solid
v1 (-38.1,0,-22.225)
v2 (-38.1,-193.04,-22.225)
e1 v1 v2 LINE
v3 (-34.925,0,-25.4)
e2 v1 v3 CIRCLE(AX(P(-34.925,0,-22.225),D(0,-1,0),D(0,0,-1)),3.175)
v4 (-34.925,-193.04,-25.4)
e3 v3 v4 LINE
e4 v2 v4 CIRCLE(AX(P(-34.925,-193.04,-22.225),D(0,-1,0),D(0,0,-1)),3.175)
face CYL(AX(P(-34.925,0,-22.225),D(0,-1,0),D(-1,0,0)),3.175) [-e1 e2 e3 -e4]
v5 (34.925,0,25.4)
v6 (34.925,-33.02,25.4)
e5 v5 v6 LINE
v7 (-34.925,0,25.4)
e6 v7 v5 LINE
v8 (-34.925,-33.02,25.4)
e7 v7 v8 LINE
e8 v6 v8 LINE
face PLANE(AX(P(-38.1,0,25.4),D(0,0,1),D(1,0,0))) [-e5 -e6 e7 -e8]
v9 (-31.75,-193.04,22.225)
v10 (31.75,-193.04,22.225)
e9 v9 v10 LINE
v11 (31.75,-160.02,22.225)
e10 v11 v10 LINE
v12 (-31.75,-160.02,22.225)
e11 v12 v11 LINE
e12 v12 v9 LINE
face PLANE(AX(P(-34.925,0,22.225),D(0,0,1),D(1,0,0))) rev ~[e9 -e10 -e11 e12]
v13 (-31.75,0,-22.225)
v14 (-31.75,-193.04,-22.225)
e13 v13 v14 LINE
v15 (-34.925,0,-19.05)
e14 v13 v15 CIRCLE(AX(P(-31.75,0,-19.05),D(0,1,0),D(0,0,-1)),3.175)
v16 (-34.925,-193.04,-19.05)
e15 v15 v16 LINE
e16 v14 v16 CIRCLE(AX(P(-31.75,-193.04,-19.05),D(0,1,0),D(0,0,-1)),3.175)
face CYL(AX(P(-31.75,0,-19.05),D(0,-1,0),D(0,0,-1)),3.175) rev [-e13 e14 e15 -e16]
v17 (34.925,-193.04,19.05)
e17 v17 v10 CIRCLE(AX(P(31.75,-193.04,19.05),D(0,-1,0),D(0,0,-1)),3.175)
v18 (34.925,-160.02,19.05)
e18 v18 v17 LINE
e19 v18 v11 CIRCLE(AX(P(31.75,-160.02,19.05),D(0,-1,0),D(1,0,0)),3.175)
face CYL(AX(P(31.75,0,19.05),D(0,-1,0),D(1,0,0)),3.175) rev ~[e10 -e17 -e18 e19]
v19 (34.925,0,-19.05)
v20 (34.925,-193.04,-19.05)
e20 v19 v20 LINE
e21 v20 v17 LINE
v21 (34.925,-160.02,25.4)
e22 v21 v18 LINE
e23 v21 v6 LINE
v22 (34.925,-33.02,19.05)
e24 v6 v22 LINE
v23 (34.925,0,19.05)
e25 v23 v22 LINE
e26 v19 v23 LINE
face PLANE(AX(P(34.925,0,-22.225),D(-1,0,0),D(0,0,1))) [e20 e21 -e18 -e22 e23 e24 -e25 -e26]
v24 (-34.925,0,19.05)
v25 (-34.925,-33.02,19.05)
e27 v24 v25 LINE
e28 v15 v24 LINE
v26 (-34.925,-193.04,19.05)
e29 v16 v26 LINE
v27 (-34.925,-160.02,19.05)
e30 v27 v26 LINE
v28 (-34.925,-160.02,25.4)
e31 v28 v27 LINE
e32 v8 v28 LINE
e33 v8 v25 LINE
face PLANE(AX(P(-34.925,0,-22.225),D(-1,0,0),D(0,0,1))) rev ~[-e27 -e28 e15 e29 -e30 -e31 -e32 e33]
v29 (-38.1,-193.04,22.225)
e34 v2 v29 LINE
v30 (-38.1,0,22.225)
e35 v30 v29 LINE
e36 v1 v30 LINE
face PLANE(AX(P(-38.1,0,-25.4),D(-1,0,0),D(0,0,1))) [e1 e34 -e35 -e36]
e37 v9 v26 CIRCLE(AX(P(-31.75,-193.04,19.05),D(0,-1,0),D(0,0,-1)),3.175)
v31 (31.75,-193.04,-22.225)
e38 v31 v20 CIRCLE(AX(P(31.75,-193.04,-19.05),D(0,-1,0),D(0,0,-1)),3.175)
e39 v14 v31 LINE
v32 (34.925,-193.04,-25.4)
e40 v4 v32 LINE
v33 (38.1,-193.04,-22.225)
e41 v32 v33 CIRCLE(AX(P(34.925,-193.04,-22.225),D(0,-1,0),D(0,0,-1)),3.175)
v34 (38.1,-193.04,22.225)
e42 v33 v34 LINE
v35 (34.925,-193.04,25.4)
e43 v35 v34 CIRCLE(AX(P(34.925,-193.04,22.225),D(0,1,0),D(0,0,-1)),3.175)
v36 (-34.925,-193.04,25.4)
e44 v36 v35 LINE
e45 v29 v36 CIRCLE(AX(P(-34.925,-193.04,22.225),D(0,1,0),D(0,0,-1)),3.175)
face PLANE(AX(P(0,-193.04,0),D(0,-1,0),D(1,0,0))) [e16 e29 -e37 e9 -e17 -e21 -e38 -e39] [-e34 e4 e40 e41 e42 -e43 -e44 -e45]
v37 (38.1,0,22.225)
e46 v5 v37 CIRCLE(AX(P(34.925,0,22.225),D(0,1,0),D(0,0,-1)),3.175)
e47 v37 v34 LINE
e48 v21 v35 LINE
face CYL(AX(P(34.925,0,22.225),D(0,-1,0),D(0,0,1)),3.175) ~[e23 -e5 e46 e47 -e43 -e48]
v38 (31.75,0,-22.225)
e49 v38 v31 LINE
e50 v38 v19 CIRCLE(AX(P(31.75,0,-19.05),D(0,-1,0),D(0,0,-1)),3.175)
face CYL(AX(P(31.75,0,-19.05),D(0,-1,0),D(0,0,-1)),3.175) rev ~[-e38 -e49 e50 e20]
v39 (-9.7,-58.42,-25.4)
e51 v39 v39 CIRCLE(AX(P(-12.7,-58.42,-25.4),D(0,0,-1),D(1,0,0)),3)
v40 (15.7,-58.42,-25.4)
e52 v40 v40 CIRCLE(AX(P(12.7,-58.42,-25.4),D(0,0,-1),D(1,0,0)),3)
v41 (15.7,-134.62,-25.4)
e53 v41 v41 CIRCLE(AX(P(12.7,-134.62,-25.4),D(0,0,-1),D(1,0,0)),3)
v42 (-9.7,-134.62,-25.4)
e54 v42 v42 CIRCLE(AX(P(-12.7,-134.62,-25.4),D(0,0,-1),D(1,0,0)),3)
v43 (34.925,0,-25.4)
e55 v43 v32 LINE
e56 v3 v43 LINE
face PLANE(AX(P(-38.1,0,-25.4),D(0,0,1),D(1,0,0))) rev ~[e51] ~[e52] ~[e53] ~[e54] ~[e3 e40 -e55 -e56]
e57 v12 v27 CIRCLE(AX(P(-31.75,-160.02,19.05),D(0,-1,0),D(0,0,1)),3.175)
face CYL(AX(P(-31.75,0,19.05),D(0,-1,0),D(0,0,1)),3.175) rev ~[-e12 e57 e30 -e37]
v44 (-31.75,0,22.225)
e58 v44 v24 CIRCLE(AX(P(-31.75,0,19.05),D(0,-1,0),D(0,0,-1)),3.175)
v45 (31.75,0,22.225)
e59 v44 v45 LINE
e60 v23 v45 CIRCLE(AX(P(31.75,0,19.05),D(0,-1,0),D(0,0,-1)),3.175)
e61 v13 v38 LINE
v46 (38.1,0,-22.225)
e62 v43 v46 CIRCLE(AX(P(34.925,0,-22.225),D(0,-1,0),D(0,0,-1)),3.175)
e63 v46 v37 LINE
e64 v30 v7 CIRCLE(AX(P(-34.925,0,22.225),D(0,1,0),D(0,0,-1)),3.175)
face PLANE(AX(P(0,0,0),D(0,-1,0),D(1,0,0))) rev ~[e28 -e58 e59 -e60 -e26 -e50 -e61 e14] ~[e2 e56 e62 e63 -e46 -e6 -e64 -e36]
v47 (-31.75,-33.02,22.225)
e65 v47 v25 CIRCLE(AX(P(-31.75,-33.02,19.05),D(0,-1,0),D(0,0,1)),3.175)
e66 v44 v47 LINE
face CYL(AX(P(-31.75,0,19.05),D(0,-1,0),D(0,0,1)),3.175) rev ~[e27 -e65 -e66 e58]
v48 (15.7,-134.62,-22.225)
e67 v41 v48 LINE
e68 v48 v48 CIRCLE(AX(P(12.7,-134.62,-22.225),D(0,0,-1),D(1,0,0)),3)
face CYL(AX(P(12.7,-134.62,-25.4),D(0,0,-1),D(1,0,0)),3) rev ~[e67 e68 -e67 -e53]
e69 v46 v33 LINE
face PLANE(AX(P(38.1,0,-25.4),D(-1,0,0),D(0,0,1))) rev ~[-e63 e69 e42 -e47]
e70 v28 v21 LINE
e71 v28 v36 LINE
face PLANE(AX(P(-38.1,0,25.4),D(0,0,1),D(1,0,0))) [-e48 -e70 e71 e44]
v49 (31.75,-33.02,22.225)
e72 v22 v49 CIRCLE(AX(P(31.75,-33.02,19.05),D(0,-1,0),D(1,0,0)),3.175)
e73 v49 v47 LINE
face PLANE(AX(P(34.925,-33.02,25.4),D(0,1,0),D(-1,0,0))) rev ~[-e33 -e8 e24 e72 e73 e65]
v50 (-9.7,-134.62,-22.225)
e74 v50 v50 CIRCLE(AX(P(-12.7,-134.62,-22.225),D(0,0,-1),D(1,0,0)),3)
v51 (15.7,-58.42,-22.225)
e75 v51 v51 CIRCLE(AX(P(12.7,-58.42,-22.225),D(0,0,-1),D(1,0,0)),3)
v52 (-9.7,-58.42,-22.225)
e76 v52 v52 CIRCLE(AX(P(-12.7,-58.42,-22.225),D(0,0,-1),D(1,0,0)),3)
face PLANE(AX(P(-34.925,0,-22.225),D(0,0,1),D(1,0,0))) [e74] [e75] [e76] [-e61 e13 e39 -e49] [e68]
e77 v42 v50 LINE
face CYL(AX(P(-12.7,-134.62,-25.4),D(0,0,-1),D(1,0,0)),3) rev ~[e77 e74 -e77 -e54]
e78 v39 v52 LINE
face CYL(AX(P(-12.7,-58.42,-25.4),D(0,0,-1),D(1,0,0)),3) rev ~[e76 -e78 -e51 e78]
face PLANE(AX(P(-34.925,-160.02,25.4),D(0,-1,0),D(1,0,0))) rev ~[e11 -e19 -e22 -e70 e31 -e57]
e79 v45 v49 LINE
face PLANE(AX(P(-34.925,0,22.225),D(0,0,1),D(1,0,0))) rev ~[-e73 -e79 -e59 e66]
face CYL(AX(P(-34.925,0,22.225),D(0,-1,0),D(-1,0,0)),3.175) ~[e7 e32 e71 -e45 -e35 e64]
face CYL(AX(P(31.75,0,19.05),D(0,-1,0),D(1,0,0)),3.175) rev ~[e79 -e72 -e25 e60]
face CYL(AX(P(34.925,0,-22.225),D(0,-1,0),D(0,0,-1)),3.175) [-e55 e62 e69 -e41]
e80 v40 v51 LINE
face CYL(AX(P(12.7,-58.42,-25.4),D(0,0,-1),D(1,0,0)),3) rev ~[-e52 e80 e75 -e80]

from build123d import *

# Parameters (mm, degrees)
F0_W     = 76.2
F0_H     = 50.8
F0_W_2   = 69.85
F0_H_2   = 44.45
F2_DEPTH = 193.04
F3_R     = 3.175
F4_R     = 3
F5_DEPTH = 25.4
F7_DEPTH = 25.4


# Not quite as in the source:
# - a variable given as a bare number and used for a length is read in inches; the dataset says mm whatever the document's units were


with BuildPart() as f2:
    # F0 (on Front) → F2 (new body)
    with BuildSketch(Plane.XZ):
        Rectangle(F0_W, F0_H)
        Rectangle(F0_W_2, F0_H_2, mode=Mode.SUBTRACT)
    extrude(amount=F2_DEPTH)

    # F3
    f3_edges = [f2.edges().sort_by_distance(p)[0] for p in [
        (-38.1, -96.52, -25.4),
        (-38.1, -96.52, 25.4),
        (38.1, -96.52, -25.4),
        (38.1, -96.52, 25.4),
        (-34.925, -96.52, -22.225),
        (-34.925, -96.52, 22.225),
        (34.925, -96.52, 22.225),
        (34.925, -96.52, -22.225),
    ]]
    fillet(f3_edges, radius=F3_R)

    # F4 (on face) → F5 (cut)
    with BuildSketch(Plane(origin=(0, 0, -25.4), x_dir=(1, 0, 0), z_dir=(0, 0, -1))):
        with Locations((-12.7, 58.42)):
            Circle(F4_R)
        with Locations((12.7, 58.42)):
            Circle(F4_R)
        with Locations((12.7, 134.62)):
            Circle(F4_R)
        with Locations((-12.7, 134.62)):
            Circle(F4_R)
    extrude(amount=-F5_DEPTH, mode=Mode.SUBTRACT)

    # F6 (on face) → F7 (cut)
    with BuildSketch(Plane.XY.offset(25.4)):
        Polygon((34.925, -33.02), (0, -33.02), (-34.925, -33.02), (-34.925, -160.02), (34.925, -160.02), align=None)
    extrude(amount=-F7_DEPTH, mode=Mode.SUBTRACT)


solid = f2.part
